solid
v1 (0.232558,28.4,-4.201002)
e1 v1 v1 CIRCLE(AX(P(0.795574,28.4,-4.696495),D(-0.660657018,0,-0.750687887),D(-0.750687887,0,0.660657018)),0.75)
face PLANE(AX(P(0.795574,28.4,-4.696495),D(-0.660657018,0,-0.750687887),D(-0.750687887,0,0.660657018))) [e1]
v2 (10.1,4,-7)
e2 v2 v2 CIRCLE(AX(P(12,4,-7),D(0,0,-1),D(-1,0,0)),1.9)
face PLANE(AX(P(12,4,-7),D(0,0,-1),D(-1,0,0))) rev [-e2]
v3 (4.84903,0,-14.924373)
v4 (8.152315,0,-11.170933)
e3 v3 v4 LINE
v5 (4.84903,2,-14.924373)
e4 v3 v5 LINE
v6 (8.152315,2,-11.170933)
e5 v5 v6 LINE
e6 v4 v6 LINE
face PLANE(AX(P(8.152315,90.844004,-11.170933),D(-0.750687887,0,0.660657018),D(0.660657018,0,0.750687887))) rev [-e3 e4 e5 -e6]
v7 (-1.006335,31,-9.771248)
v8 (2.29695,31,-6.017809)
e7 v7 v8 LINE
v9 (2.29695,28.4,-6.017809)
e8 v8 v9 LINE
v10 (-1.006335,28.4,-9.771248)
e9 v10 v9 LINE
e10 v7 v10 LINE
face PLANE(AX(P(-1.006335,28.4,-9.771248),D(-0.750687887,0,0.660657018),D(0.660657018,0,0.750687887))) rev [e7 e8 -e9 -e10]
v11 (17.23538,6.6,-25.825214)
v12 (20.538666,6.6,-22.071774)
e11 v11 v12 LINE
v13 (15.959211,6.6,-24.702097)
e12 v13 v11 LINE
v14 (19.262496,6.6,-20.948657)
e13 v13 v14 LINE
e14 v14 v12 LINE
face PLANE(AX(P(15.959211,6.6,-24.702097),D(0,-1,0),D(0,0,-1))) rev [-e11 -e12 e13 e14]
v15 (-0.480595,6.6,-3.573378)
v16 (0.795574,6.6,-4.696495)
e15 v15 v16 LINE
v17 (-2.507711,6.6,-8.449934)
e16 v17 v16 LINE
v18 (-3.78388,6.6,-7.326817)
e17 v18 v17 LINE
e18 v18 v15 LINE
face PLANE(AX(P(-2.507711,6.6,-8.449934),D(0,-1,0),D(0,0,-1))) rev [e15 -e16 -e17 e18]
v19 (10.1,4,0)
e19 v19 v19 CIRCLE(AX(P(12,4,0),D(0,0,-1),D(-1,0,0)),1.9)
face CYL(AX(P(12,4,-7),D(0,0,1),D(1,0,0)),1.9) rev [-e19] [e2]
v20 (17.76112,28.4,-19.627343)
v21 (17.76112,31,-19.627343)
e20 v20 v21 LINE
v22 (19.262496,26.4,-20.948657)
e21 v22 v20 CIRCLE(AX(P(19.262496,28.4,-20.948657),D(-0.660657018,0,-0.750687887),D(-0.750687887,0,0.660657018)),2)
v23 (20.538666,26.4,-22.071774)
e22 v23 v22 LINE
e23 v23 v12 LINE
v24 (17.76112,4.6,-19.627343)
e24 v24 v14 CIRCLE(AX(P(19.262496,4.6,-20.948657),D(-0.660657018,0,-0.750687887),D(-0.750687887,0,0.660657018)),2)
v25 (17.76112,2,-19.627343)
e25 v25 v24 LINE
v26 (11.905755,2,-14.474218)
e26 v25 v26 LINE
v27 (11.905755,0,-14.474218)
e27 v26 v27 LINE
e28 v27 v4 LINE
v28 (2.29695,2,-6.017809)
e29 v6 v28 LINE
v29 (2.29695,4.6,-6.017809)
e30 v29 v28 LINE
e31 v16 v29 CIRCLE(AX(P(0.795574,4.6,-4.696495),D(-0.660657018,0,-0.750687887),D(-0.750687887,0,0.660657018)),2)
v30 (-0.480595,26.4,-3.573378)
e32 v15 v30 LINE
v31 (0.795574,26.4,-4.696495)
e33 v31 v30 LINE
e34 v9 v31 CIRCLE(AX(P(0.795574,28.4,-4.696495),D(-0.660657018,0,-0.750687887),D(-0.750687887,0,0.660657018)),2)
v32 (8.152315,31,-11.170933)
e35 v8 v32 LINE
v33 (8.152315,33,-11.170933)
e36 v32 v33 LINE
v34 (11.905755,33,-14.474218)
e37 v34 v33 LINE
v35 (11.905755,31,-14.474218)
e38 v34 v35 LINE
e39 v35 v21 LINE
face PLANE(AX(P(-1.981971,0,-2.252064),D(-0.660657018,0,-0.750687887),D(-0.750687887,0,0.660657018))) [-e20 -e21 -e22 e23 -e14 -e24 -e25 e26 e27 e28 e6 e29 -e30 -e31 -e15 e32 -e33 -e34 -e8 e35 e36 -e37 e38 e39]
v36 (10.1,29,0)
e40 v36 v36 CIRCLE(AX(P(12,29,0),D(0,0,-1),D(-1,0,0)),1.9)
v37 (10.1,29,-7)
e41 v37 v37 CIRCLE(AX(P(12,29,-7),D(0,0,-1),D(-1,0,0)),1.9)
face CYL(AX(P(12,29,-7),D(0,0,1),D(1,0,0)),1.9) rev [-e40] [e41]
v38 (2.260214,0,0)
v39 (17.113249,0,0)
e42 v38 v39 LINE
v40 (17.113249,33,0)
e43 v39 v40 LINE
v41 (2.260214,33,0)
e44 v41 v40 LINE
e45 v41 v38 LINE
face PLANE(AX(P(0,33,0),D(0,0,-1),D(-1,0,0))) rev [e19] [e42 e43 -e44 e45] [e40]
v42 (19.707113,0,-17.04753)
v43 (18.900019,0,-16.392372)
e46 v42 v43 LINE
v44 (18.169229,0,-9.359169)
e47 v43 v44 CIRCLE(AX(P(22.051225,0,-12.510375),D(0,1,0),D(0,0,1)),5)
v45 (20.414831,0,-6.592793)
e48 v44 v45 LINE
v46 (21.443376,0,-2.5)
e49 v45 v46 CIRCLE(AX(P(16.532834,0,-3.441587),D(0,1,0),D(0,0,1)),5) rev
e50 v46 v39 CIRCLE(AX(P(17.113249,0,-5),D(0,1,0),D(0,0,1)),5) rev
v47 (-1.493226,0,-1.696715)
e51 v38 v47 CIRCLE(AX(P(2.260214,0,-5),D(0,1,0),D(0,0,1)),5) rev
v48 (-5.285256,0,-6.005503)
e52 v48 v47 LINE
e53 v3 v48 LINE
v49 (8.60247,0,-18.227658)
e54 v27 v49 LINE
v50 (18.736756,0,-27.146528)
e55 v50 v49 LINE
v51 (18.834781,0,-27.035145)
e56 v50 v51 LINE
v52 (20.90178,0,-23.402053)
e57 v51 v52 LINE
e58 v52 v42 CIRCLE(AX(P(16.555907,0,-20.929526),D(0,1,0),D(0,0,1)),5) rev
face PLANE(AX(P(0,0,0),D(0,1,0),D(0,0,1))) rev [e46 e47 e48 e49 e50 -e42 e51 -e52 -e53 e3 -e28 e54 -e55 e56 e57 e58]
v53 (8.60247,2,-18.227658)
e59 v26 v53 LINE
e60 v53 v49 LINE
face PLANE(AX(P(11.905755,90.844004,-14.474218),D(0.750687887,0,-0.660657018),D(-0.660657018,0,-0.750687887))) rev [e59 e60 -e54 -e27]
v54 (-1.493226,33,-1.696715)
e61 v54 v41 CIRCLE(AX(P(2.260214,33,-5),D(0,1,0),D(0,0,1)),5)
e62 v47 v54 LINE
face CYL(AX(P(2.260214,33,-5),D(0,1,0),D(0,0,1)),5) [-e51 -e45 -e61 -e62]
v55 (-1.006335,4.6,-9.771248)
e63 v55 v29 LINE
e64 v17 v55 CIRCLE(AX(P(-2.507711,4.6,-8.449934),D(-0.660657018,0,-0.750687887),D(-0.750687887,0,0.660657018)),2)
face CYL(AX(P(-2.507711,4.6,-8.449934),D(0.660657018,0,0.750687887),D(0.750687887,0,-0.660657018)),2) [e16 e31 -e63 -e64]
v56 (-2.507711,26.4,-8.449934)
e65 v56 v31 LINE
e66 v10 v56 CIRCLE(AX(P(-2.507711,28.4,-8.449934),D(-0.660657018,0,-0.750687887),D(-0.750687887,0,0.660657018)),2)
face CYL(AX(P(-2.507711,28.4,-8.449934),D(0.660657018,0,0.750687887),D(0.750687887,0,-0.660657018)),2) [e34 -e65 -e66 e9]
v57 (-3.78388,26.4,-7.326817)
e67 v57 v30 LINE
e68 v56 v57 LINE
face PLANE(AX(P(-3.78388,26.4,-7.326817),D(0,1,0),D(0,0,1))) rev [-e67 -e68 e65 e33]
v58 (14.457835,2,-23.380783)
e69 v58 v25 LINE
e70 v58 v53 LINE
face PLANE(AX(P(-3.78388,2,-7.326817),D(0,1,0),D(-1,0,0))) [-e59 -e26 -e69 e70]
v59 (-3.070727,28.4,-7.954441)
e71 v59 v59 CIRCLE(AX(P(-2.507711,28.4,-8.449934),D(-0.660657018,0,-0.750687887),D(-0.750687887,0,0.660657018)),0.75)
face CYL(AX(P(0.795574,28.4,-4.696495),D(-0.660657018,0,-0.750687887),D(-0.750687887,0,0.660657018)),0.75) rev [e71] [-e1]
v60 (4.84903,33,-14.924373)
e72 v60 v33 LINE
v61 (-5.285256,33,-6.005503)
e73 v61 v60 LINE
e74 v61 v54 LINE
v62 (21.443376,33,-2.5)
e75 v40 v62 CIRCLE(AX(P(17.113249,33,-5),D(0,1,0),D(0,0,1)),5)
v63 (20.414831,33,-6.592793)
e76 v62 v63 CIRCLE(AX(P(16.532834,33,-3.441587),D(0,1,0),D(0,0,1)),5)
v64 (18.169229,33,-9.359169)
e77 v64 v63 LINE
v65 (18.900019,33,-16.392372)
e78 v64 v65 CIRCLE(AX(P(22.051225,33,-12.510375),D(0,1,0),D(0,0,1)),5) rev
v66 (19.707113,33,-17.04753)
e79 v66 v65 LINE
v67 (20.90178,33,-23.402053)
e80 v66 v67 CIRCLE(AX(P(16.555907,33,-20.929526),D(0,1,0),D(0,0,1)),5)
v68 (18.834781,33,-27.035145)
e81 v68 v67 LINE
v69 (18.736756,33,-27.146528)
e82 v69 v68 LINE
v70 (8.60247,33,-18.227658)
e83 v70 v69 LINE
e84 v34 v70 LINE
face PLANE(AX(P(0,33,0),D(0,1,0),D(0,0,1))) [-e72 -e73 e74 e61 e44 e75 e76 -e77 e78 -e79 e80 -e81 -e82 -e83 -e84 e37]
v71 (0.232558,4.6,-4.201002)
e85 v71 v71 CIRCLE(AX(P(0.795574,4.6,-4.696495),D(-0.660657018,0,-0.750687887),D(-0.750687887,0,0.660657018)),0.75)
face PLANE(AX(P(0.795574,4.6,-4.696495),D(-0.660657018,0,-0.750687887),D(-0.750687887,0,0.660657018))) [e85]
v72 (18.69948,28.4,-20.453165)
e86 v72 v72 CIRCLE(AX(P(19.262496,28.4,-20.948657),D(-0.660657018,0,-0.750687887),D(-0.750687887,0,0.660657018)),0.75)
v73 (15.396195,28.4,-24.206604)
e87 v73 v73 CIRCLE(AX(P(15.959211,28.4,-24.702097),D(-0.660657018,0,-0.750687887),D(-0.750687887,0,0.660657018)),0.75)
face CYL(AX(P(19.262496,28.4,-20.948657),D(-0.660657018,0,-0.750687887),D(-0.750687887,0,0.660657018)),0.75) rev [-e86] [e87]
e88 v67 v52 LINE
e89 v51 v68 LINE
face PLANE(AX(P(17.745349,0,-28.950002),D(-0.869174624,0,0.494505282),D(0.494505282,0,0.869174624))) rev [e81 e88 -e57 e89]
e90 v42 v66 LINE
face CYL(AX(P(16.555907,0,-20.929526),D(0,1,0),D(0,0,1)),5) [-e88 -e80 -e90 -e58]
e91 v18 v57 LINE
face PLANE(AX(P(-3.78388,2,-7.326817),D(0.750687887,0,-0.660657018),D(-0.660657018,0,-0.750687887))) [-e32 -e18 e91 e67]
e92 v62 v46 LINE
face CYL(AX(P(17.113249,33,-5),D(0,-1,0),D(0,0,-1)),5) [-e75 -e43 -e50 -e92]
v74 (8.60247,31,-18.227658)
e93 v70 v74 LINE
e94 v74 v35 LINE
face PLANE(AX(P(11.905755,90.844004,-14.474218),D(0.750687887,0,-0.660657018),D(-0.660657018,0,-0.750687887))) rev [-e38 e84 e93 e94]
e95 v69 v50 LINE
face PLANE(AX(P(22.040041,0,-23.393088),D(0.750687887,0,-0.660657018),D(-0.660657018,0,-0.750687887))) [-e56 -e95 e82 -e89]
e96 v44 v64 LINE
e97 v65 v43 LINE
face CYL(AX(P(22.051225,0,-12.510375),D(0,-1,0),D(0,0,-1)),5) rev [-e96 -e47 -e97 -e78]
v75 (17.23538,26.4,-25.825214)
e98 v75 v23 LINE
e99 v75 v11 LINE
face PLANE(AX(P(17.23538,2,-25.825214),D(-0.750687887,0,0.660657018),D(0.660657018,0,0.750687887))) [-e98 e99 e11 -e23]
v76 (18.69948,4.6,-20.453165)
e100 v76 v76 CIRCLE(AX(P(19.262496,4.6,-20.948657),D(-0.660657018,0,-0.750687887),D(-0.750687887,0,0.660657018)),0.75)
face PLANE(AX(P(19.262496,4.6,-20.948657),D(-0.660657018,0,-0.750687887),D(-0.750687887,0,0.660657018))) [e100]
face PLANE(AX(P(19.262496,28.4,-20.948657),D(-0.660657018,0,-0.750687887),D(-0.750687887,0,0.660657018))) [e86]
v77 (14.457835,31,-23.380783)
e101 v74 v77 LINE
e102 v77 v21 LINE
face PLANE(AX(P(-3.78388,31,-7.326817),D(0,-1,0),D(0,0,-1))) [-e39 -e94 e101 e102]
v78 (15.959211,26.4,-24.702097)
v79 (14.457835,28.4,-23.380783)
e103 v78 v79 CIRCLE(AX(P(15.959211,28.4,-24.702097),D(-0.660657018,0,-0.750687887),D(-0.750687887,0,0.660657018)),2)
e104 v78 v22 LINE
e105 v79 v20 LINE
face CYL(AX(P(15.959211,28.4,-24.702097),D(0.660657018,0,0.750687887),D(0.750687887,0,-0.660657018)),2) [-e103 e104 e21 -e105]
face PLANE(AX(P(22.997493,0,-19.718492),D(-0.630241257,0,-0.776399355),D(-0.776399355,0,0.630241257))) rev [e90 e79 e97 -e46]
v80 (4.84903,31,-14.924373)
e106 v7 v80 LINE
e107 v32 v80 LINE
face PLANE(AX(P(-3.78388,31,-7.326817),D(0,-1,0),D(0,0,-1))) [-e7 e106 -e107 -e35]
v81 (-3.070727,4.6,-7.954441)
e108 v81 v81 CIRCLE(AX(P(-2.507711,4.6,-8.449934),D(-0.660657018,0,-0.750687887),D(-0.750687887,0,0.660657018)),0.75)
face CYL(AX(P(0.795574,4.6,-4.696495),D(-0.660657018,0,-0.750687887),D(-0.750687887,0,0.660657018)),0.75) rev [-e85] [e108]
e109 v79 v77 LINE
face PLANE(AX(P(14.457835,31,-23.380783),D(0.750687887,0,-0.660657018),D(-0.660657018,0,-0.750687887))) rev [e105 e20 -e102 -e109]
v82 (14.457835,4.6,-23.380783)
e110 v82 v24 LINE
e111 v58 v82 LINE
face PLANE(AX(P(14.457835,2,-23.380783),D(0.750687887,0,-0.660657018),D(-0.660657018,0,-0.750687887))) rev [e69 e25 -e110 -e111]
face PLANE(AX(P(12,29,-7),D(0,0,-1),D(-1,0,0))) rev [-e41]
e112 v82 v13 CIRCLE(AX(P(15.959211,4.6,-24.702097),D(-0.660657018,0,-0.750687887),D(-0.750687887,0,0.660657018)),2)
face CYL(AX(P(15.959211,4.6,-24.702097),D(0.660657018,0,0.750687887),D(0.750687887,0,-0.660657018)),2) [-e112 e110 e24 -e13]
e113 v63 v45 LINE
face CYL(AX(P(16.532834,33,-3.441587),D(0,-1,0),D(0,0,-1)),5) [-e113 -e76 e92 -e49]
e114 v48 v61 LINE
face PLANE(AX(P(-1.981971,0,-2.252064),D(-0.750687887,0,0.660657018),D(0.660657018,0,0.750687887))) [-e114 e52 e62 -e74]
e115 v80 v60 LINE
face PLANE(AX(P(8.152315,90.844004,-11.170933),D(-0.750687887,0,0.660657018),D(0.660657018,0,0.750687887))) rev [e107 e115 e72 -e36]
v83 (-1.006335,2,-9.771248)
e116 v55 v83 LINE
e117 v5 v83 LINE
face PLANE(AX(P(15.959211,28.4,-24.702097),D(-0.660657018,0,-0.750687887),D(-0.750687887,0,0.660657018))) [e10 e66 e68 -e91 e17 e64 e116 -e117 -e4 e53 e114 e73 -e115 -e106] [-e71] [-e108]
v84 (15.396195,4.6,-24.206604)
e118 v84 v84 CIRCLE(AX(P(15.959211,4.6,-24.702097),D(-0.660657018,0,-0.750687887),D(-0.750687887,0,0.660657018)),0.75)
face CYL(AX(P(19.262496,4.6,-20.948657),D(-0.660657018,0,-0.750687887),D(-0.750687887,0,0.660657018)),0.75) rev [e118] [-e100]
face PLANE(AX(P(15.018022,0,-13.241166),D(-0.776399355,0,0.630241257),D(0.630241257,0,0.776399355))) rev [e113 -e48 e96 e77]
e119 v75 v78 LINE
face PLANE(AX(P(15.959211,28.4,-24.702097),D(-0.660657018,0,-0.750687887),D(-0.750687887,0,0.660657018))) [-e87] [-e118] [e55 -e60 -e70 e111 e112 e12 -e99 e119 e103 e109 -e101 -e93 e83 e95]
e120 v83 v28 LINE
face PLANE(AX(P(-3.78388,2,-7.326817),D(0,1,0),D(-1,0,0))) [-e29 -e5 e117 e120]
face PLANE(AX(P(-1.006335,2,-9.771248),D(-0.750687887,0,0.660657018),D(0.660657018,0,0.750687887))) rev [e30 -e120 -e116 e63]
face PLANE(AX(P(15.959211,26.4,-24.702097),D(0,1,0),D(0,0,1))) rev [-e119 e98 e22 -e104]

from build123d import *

# Parameters (mm, degrees)
BOSS_EXTRUDE1_DEPTH = 33
SKETCH2_W           = 32
SKETCH2_H           = 33
BOSS_EXTRUDE2_DEPTH = 3
SKETCH3_R           = 1.9
CUT_EXTRUDE1_DEPTH  = 7
FILLET1_R           = 5
SKETCH5_R           = 2
BOSS_EXTRUDE3_DEPTH = 5
SKETCH6_W           = 32
SKETCH6_H           = 33
SKETCH6_W_2         = 28
SKETCH6_H_2         = 29
BOSS_EXTRUDE4_DEPTH = 5
BOSS_EXTRUDE5_DEPTH = 5
SKETCH7_R           = 0.75
SKETCH7_W           = 5
SKETCH7_H           = 119.688008906
CUT_EXTRUDE3_DEPTH  = 5
CUT_EXTRUDE4_DEPTH  = 53.302482054
CUT_EXTRUDE5_DEPTH  = 51.632111281
FILLET4_R           = 5


with BuildPart() as part:
    # Sketch1 → Boss-Extrude1 (new body)
    with BuildSketch(Plane(origin=(0, 0, 0), x_dir=(1, 0, 0), z_dir=(0, 1, 0))):
        Polygon((0, 0), (20, 0), (30.159835274, 17.597350892), (24.022012397, 21.141024582), align=None)
    extrude(amount=BOSS_EXTRUDE1_DEPTH)

    # Sketch2 → Boss-Extrude2 (add)
    with BuildSketch(Plane(origin=(0, 0, 0), x_dir=(0.7506878874077226, 0, -0.660657018201828), z_dir=(0.660657018201828, 0, 0.7506878874077226))):
        with Locations((16, 16.5)):
            Rectangle(SKETCH2_W, SKETCH2_H)
    extrude(amount=-BOSS_EXTRUDE2_DEPTH)

    # Sketch3 → Cut-Extrude1 (cut)
    with BuildSketch(Plane(origin=(30, 0, 0), x_dir=(-1, 0, 0), z_dir=(0, 0, -1))):
        with Locations((18, 29)):
            Circle(SKETCH3_R)
        with Locations((18, 4)):
            Circle(SKETCH3_R)
    extrude(amount=CUT_EXTRUDE1_DEPTH, mode=Mode.SUBTRACT)

    # Fillet1
    fillet1_edges = [part.edges().sort_by_distance(p)[0] for p in [
        (20, 16.5, 0),
    ]]
    fillet(fillet1_edges, radius=FILLET1_R)

    # Sketch5 → Boss-Extrude3 (add)
    with BuildSketch(Plane(origin=(-1.981971055, 0, -2.252063662), x_dir=(-0.7506878874077226, 0, 0.660657018201828), z_dir=(-0.660657018201828, 0, -0.7506878874077226))):
        with Locations((-28.3, 28.4)):
            Circle(SKETCH5_R)
        with Locations((-3.7, 28.4)):
            Circle(SKETCH5_R)
        with Locations((-28.3, 4.6)):
            Circle(SKETCH5_R)
        with Locations((-3.7, 4.6)):
            Circle(SKETCH5_R)
    extrude(amount=BOSS_EXTRUDE3_DEPTH)

    # Sketch6 → Boss-Extrude4 (add)
    with BuildSketch(Plane(origin=(-1.981971055, 0, -2.252063662), x_dir=(-0.7506878874077226, 0, 0.660657018201828), z_dir=(-0.660657018201828, 0, -0.7506878874077226))):
        with Locations((-16, 16.5)):
            Rectangle(SKETCH6_W, SKETCH6_H)
        with Locations((-16, 16.5)):
            Rectangle(SKETCH6_W_2, SKETCH6_H_2, mode=Mode.SUBTRACT)
    extrude(amount=BOSS_EXTRUDE4_DEPTH)

    # Sketch9 → Boss-Extrude5 (add)
    with BuildSketch(Plane(origin=(-1.981971055, 0, -2.252063662), x_dir=(-0.7506878874077226, 0, 0.660657018201828), z_dir=(-0.660657018201828, 0, -0.7506878874077226))):
        Polygon((-28.3, 26.4), (-30, 26.4), (-30, 31), (-26.3, 31), (-26.3, 28.4), align=None)
        Polygon((-5.7, 28.4), (-5.7, 31), (-2, 31), (-2, 26.4), (-3.7, 26.4), align=None)
        Polygon((-3.7, 6.6), (-2, 6.6), (-2, 2), (-5.7, 2), (-5.7, 4.6), align=None)
        Polygon((-28.3, 6.6), (-30, 6.6), (-30, 2), (-26.3, 2), (-26.3, 4.6), align=None)
    extrude(amount=BOSS_EXTRUDE5_DEPTH)

    # Sketch7 → Cut-Extrude3 (cut)
    with BuildSketch(Plane(origin=(-5.285256146, 0, -6.005503099), x_dir=(-0.7506878874077226, 0, 0.660657018201828), z_dir=(-0.660657018201828, 0, -0.7506878874077226))):
        with Locations((-28.3, 28.4)):
            Circle(SKETCH7_R)
        with Locations((-3.7, 28.4)):
            Circle(SKETCH7_R)
        with Locations((-3.7, 4.6)):
            Circle(SKETCH7_R)
        with Locations((-28.3, 4.6)):
            Circle(SKETCH7_R)
        with Locations((-16, 31)):
            Rectangle(SKETCH7_W, SKETCH7_H)
    extrude(amount=-CUT_EXTRUDE3_DEPTH, mode=Mode.SUBTRACT)

    # Sketch8 → Cut-Extrude4 (cut, through all)
    with BuildSketch(Plane(origin=(0, 33, 0), x_dir=(1, 0, 0), z_dir=(0, 1, 0))):
        Polygon((17.745348673, 28.950001735), (16.878144986, 39.625600728), (45.212516216, 18.101512889), (33.036600924, 2.073102927), align=None)
    extrude(amount=-CUT_EXTRUDE4_DEPTH, mode=Mode.SUBTRACT)

    # Sketch10 → Cut-Extrude5 (cut, through all)
    with BuildSketch(Plane(origin=(0, 33, 0), x_dir=(1, 0, 0), z_dir=(0, 1, 0))):
        Polygon((22.997492955, 19.718491584), (15.018022413, 13.241165816), (22.396735909, 4.151268367), (32.809004156, 12.603414793), align=None)
    extrude(amount=-CUT_EXTRUDE5_DEPTH, mode=Mode.SUBTRACT)

    # Fillet4
    # the kernel refuses this fillet: 5 mm, written as the material it adds along each edge
    with BuildSketch(Plane(origin=(15.018022413, 33, -13.241165816), x_dir=(0.7763993545799179, 0, -0.6302412571451403), z_dir=(0, -1, 0))) as fillet4_piece_1:
        with BuildLine():
            CenterArc((FILLET4_R, FILLET4_R), FILLET4_R, 180, 90)
            Line((0, FILLET4_R), (0, 0))
            Line((0, 0), (FILLET4_R, 0))
        make_face()
    extrude(amount=33)
    # the kernel refuses this fillet: 5 mm, written as the material it takes off along each edge
    with BuildSketch(Plane(origin=(22.396735909, 40.861690342, -4.151268367), x_dir=(-0.6302412571451408, 0, -0.7763993545799174), z_dir=(0, -1, 0))) as fillet4_2_piece_1:
        with BuildLine():
            CenterArc((3.144676137, -5), FILLET4_R, 90, 49.922525522)
            Line((-0.681196741, -1.780885723), (0, 0))
            Line((0, 0), (3.144676137, 0))
        make_face()
    extrude(amount=48.723380684, mode=Mode.SUBTRACT)
    with BuildSketch(Plane(origin=(22.997492955, 43.594997798, -19.718491584), x_dir=(-0.4945052818029634, 0, -0.8691746235762823), z_dir=(0, -1, 0))) as fillet4_2_piece_2:
        with BuildLine():
            CenterArc((FILLET4_R * 0.847599823854, -FILLET4_R), FILLET4_R, 90, 80.569209056)
            Line((-FILLET4_R * 0.138884423377, -FILLET4_R * 0.836143874187), (0, 0))
            Line((0, 0), (FILLET4_R * 0.847599823854, 0))
        make_face()
    extrude(amount=54.189995596, mode=Mode.SUBTRACT)
    with BuildSketch(Plane(origin=(0, -5.650533789, 0), x_dir=(1, 0, 0), z_dir=(0, 1, 0))) as fillet4_2_piece_3:
        with BuildLine():
            CenterArc((FILLET4_R * 0.452042703087, FILLET4_R), FILLET4_R, 221.35, 48.65)
            Line((-FILLET4_R * 0.298645184321, FILLET4_R * 0.339342981798), (0, 0))
            Line((0, 0), (FILLET4_R * 0.452042703087, 0))
        make_face()
    extrude(amount=44.301067577, mode=Mode.SUBTRACT)


solid = part.part
